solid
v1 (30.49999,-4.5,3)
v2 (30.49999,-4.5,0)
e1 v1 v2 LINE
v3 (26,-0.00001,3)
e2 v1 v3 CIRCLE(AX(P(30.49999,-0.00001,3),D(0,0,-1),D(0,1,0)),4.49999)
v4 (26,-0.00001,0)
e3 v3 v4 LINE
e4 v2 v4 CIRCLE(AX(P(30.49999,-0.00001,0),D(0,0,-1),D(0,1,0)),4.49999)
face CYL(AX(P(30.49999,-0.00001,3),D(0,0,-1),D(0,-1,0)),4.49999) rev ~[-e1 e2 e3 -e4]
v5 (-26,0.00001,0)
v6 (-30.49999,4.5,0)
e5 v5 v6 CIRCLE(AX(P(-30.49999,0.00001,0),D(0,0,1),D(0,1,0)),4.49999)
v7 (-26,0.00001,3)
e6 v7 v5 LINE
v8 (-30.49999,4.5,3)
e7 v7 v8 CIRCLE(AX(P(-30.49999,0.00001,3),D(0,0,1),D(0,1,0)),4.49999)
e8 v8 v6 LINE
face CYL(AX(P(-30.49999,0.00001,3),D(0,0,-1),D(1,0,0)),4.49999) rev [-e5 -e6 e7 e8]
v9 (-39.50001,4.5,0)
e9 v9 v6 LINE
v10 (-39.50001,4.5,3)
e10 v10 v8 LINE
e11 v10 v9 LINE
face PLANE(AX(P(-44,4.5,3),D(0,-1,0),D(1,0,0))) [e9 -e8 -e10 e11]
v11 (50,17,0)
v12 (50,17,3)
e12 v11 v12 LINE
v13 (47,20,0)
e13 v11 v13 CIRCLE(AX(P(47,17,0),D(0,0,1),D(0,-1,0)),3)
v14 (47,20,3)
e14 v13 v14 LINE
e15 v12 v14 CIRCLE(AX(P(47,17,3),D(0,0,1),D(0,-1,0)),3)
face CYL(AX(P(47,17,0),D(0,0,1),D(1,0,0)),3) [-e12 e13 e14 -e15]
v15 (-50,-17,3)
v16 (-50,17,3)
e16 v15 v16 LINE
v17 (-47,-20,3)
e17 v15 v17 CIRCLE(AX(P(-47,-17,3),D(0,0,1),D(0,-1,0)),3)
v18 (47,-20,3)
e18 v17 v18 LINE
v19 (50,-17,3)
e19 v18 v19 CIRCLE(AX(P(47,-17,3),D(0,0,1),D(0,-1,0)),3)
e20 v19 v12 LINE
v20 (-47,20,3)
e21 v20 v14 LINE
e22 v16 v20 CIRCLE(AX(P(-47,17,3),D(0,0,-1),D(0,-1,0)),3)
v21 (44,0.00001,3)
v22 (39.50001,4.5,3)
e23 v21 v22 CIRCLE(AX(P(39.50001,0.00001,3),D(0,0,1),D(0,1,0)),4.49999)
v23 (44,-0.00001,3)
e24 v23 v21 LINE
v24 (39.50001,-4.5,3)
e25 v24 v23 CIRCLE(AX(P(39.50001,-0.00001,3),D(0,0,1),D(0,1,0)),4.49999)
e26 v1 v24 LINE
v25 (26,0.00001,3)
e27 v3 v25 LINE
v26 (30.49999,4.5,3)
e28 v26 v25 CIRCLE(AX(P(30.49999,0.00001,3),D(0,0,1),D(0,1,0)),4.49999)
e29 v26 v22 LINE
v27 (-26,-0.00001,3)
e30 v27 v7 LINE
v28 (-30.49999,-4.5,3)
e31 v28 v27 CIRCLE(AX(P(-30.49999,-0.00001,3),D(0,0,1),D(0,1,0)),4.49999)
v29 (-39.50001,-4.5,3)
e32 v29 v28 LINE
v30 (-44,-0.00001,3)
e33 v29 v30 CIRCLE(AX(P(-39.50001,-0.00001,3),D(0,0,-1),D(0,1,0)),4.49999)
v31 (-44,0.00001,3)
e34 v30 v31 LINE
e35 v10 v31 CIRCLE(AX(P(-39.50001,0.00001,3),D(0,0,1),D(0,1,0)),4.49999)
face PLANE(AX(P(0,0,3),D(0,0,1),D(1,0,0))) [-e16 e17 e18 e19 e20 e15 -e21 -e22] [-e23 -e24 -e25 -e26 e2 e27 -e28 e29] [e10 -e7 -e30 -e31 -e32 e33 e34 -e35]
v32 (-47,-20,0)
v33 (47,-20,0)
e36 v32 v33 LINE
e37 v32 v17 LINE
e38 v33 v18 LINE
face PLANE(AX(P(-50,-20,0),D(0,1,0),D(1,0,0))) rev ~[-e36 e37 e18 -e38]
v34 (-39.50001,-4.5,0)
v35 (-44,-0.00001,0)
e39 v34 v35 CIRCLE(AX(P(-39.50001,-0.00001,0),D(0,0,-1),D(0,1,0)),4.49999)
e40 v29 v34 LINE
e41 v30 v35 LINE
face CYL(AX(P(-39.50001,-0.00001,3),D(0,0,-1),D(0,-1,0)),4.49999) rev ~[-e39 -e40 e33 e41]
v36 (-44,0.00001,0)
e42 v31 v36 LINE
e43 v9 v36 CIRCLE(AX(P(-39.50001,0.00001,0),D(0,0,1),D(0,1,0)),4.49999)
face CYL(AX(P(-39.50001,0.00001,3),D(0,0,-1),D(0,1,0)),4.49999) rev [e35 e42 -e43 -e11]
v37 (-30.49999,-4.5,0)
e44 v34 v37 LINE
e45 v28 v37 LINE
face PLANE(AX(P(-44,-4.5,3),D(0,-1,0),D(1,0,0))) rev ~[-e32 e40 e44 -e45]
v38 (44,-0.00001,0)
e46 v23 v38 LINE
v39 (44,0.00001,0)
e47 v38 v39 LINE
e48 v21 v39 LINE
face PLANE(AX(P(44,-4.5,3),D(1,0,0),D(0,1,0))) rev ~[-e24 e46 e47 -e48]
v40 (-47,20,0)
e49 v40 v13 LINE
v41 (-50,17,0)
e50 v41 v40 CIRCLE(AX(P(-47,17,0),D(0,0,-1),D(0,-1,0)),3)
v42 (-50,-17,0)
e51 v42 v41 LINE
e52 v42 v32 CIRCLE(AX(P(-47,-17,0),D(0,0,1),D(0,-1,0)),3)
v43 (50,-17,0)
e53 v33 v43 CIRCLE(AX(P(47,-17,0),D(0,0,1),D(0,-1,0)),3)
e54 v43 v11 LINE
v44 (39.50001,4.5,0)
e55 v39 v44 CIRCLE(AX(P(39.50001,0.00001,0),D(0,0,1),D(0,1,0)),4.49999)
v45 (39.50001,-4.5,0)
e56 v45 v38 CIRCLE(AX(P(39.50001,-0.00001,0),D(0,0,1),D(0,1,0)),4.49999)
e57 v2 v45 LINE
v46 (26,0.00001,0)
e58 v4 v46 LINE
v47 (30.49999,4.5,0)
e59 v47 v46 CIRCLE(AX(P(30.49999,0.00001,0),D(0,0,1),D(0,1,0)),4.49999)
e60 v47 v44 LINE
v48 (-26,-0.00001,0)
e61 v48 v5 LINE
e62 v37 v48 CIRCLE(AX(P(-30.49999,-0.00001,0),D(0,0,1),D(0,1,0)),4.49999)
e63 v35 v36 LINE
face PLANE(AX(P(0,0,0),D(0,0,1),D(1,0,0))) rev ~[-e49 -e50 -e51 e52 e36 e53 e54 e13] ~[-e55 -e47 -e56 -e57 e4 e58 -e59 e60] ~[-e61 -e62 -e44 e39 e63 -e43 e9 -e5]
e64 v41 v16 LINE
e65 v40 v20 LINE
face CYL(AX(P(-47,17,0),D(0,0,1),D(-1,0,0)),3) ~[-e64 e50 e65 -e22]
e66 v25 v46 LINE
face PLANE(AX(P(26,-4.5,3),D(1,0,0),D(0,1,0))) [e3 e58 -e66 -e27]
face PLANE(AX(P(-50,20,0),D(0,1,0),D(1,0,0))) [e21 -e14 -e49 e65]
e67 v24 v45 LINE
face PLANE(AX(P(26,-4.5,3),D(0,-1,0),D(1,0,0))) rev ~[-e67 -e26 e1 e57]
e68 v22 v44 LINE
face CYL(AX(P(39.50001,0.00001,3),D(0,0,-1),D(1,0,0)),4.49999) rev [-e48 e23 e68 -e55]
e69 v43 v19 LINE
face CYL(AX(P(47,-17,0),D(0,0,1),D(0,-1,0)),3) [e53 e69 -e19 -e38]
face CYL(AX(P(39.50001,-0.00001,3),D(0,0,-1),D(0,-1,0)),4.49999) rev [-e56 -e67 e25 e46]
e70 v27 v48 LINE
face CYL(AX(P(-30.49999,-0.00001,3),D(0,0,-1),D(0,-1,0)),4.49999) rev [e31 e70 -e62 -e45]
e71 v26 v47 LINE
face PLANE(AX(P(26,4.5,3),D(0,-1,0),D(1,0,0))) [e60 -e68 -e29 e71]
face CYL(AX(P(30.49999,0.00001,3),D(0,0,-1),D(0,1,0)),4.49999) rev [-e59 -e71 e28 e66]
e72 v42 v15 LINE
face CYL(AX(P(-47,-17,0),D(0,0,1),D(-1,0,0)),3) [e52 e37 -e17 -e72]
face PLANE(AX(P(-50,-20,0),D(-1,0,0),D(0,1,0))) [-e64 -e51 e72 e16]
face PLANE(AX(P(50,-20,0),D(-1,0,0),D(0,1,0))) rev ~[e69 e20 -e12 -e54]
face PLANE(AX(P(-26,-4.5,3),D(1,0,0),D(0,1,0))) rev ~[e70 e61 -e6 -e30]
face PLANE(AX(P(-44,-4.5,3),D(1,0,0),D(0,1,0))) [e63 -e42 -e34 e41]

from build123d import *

# Parameters (mm, degrees)
F0_W     = 100
F0_H     = 40
F1_DEPTH = 3
F2_R     = 3
F3_W     = 18
F3_H     = 9
F4_DEPTH = 25
F5_R     = 4.49999
F6_R     = 4.49999


# Not quite as in the source:
# - a fillet or chamfer is up to 0.001 mm smaller than in the source, because OpenCascade refuses the exact size


with BuildPart() as f1:
    # F0 (on Top) → F1 (new body)
    with BuildSketch(Plane.XY):
        Rectangle(F0_W, F0_H)
    extrude(amount=F1_DEPTH)

    # F2
    f2_edges = [f1.edges().sort_by_distance(p)[0] for p in [
        (50, -20, 1.5),
        (50, 20, 1.5),
        (-50, -20, 1.5),
        (-50, 20, 1.5),
    ]]
    fillet(f2_edges, radius=F2_R)

    # F3 (on face) → F4 (cut)
    with BuildSketch(Plane.XY.offset(3)):
        with Locations((-35, 0)):
            Rectangle(F3_W, F3_H)
        with Locations((35, 0)):
            Rectangle(F3_W, F3_H)
    extrude(amount=-F4_DEPTH, mode=Mode.SUBTRACT)

    # F5 (radius 4.5 in the source; OpenCascade refuses exactly that, so slightly less here)
    f5_edges = [f1.edges().sort_by_distance(p)[0] for p in [
        (-44, 4.5, 1.5),
        (-26, 4.5, 1.5),
        (-26, -4.5, 1.5),
        (-44, -4.5, 1.5),
    ]]
    fillet(f5_edges, radius=F5_R)

    # F6 (radius 4.5 in the source; OpenCascade refuses exactly that, so slightly less here)
    f6_edges = [f1.edges().sort_by_distance(p)[0] for p in [
        (26, 4.5, 1.5),
        (44, 4.5, 1.5),
        (44, -4.5, 1.5),
        (26, -4.5, 1.5),
    ]]
    fillet(f6_edges, radius=F6_R)


solid = f1.part
